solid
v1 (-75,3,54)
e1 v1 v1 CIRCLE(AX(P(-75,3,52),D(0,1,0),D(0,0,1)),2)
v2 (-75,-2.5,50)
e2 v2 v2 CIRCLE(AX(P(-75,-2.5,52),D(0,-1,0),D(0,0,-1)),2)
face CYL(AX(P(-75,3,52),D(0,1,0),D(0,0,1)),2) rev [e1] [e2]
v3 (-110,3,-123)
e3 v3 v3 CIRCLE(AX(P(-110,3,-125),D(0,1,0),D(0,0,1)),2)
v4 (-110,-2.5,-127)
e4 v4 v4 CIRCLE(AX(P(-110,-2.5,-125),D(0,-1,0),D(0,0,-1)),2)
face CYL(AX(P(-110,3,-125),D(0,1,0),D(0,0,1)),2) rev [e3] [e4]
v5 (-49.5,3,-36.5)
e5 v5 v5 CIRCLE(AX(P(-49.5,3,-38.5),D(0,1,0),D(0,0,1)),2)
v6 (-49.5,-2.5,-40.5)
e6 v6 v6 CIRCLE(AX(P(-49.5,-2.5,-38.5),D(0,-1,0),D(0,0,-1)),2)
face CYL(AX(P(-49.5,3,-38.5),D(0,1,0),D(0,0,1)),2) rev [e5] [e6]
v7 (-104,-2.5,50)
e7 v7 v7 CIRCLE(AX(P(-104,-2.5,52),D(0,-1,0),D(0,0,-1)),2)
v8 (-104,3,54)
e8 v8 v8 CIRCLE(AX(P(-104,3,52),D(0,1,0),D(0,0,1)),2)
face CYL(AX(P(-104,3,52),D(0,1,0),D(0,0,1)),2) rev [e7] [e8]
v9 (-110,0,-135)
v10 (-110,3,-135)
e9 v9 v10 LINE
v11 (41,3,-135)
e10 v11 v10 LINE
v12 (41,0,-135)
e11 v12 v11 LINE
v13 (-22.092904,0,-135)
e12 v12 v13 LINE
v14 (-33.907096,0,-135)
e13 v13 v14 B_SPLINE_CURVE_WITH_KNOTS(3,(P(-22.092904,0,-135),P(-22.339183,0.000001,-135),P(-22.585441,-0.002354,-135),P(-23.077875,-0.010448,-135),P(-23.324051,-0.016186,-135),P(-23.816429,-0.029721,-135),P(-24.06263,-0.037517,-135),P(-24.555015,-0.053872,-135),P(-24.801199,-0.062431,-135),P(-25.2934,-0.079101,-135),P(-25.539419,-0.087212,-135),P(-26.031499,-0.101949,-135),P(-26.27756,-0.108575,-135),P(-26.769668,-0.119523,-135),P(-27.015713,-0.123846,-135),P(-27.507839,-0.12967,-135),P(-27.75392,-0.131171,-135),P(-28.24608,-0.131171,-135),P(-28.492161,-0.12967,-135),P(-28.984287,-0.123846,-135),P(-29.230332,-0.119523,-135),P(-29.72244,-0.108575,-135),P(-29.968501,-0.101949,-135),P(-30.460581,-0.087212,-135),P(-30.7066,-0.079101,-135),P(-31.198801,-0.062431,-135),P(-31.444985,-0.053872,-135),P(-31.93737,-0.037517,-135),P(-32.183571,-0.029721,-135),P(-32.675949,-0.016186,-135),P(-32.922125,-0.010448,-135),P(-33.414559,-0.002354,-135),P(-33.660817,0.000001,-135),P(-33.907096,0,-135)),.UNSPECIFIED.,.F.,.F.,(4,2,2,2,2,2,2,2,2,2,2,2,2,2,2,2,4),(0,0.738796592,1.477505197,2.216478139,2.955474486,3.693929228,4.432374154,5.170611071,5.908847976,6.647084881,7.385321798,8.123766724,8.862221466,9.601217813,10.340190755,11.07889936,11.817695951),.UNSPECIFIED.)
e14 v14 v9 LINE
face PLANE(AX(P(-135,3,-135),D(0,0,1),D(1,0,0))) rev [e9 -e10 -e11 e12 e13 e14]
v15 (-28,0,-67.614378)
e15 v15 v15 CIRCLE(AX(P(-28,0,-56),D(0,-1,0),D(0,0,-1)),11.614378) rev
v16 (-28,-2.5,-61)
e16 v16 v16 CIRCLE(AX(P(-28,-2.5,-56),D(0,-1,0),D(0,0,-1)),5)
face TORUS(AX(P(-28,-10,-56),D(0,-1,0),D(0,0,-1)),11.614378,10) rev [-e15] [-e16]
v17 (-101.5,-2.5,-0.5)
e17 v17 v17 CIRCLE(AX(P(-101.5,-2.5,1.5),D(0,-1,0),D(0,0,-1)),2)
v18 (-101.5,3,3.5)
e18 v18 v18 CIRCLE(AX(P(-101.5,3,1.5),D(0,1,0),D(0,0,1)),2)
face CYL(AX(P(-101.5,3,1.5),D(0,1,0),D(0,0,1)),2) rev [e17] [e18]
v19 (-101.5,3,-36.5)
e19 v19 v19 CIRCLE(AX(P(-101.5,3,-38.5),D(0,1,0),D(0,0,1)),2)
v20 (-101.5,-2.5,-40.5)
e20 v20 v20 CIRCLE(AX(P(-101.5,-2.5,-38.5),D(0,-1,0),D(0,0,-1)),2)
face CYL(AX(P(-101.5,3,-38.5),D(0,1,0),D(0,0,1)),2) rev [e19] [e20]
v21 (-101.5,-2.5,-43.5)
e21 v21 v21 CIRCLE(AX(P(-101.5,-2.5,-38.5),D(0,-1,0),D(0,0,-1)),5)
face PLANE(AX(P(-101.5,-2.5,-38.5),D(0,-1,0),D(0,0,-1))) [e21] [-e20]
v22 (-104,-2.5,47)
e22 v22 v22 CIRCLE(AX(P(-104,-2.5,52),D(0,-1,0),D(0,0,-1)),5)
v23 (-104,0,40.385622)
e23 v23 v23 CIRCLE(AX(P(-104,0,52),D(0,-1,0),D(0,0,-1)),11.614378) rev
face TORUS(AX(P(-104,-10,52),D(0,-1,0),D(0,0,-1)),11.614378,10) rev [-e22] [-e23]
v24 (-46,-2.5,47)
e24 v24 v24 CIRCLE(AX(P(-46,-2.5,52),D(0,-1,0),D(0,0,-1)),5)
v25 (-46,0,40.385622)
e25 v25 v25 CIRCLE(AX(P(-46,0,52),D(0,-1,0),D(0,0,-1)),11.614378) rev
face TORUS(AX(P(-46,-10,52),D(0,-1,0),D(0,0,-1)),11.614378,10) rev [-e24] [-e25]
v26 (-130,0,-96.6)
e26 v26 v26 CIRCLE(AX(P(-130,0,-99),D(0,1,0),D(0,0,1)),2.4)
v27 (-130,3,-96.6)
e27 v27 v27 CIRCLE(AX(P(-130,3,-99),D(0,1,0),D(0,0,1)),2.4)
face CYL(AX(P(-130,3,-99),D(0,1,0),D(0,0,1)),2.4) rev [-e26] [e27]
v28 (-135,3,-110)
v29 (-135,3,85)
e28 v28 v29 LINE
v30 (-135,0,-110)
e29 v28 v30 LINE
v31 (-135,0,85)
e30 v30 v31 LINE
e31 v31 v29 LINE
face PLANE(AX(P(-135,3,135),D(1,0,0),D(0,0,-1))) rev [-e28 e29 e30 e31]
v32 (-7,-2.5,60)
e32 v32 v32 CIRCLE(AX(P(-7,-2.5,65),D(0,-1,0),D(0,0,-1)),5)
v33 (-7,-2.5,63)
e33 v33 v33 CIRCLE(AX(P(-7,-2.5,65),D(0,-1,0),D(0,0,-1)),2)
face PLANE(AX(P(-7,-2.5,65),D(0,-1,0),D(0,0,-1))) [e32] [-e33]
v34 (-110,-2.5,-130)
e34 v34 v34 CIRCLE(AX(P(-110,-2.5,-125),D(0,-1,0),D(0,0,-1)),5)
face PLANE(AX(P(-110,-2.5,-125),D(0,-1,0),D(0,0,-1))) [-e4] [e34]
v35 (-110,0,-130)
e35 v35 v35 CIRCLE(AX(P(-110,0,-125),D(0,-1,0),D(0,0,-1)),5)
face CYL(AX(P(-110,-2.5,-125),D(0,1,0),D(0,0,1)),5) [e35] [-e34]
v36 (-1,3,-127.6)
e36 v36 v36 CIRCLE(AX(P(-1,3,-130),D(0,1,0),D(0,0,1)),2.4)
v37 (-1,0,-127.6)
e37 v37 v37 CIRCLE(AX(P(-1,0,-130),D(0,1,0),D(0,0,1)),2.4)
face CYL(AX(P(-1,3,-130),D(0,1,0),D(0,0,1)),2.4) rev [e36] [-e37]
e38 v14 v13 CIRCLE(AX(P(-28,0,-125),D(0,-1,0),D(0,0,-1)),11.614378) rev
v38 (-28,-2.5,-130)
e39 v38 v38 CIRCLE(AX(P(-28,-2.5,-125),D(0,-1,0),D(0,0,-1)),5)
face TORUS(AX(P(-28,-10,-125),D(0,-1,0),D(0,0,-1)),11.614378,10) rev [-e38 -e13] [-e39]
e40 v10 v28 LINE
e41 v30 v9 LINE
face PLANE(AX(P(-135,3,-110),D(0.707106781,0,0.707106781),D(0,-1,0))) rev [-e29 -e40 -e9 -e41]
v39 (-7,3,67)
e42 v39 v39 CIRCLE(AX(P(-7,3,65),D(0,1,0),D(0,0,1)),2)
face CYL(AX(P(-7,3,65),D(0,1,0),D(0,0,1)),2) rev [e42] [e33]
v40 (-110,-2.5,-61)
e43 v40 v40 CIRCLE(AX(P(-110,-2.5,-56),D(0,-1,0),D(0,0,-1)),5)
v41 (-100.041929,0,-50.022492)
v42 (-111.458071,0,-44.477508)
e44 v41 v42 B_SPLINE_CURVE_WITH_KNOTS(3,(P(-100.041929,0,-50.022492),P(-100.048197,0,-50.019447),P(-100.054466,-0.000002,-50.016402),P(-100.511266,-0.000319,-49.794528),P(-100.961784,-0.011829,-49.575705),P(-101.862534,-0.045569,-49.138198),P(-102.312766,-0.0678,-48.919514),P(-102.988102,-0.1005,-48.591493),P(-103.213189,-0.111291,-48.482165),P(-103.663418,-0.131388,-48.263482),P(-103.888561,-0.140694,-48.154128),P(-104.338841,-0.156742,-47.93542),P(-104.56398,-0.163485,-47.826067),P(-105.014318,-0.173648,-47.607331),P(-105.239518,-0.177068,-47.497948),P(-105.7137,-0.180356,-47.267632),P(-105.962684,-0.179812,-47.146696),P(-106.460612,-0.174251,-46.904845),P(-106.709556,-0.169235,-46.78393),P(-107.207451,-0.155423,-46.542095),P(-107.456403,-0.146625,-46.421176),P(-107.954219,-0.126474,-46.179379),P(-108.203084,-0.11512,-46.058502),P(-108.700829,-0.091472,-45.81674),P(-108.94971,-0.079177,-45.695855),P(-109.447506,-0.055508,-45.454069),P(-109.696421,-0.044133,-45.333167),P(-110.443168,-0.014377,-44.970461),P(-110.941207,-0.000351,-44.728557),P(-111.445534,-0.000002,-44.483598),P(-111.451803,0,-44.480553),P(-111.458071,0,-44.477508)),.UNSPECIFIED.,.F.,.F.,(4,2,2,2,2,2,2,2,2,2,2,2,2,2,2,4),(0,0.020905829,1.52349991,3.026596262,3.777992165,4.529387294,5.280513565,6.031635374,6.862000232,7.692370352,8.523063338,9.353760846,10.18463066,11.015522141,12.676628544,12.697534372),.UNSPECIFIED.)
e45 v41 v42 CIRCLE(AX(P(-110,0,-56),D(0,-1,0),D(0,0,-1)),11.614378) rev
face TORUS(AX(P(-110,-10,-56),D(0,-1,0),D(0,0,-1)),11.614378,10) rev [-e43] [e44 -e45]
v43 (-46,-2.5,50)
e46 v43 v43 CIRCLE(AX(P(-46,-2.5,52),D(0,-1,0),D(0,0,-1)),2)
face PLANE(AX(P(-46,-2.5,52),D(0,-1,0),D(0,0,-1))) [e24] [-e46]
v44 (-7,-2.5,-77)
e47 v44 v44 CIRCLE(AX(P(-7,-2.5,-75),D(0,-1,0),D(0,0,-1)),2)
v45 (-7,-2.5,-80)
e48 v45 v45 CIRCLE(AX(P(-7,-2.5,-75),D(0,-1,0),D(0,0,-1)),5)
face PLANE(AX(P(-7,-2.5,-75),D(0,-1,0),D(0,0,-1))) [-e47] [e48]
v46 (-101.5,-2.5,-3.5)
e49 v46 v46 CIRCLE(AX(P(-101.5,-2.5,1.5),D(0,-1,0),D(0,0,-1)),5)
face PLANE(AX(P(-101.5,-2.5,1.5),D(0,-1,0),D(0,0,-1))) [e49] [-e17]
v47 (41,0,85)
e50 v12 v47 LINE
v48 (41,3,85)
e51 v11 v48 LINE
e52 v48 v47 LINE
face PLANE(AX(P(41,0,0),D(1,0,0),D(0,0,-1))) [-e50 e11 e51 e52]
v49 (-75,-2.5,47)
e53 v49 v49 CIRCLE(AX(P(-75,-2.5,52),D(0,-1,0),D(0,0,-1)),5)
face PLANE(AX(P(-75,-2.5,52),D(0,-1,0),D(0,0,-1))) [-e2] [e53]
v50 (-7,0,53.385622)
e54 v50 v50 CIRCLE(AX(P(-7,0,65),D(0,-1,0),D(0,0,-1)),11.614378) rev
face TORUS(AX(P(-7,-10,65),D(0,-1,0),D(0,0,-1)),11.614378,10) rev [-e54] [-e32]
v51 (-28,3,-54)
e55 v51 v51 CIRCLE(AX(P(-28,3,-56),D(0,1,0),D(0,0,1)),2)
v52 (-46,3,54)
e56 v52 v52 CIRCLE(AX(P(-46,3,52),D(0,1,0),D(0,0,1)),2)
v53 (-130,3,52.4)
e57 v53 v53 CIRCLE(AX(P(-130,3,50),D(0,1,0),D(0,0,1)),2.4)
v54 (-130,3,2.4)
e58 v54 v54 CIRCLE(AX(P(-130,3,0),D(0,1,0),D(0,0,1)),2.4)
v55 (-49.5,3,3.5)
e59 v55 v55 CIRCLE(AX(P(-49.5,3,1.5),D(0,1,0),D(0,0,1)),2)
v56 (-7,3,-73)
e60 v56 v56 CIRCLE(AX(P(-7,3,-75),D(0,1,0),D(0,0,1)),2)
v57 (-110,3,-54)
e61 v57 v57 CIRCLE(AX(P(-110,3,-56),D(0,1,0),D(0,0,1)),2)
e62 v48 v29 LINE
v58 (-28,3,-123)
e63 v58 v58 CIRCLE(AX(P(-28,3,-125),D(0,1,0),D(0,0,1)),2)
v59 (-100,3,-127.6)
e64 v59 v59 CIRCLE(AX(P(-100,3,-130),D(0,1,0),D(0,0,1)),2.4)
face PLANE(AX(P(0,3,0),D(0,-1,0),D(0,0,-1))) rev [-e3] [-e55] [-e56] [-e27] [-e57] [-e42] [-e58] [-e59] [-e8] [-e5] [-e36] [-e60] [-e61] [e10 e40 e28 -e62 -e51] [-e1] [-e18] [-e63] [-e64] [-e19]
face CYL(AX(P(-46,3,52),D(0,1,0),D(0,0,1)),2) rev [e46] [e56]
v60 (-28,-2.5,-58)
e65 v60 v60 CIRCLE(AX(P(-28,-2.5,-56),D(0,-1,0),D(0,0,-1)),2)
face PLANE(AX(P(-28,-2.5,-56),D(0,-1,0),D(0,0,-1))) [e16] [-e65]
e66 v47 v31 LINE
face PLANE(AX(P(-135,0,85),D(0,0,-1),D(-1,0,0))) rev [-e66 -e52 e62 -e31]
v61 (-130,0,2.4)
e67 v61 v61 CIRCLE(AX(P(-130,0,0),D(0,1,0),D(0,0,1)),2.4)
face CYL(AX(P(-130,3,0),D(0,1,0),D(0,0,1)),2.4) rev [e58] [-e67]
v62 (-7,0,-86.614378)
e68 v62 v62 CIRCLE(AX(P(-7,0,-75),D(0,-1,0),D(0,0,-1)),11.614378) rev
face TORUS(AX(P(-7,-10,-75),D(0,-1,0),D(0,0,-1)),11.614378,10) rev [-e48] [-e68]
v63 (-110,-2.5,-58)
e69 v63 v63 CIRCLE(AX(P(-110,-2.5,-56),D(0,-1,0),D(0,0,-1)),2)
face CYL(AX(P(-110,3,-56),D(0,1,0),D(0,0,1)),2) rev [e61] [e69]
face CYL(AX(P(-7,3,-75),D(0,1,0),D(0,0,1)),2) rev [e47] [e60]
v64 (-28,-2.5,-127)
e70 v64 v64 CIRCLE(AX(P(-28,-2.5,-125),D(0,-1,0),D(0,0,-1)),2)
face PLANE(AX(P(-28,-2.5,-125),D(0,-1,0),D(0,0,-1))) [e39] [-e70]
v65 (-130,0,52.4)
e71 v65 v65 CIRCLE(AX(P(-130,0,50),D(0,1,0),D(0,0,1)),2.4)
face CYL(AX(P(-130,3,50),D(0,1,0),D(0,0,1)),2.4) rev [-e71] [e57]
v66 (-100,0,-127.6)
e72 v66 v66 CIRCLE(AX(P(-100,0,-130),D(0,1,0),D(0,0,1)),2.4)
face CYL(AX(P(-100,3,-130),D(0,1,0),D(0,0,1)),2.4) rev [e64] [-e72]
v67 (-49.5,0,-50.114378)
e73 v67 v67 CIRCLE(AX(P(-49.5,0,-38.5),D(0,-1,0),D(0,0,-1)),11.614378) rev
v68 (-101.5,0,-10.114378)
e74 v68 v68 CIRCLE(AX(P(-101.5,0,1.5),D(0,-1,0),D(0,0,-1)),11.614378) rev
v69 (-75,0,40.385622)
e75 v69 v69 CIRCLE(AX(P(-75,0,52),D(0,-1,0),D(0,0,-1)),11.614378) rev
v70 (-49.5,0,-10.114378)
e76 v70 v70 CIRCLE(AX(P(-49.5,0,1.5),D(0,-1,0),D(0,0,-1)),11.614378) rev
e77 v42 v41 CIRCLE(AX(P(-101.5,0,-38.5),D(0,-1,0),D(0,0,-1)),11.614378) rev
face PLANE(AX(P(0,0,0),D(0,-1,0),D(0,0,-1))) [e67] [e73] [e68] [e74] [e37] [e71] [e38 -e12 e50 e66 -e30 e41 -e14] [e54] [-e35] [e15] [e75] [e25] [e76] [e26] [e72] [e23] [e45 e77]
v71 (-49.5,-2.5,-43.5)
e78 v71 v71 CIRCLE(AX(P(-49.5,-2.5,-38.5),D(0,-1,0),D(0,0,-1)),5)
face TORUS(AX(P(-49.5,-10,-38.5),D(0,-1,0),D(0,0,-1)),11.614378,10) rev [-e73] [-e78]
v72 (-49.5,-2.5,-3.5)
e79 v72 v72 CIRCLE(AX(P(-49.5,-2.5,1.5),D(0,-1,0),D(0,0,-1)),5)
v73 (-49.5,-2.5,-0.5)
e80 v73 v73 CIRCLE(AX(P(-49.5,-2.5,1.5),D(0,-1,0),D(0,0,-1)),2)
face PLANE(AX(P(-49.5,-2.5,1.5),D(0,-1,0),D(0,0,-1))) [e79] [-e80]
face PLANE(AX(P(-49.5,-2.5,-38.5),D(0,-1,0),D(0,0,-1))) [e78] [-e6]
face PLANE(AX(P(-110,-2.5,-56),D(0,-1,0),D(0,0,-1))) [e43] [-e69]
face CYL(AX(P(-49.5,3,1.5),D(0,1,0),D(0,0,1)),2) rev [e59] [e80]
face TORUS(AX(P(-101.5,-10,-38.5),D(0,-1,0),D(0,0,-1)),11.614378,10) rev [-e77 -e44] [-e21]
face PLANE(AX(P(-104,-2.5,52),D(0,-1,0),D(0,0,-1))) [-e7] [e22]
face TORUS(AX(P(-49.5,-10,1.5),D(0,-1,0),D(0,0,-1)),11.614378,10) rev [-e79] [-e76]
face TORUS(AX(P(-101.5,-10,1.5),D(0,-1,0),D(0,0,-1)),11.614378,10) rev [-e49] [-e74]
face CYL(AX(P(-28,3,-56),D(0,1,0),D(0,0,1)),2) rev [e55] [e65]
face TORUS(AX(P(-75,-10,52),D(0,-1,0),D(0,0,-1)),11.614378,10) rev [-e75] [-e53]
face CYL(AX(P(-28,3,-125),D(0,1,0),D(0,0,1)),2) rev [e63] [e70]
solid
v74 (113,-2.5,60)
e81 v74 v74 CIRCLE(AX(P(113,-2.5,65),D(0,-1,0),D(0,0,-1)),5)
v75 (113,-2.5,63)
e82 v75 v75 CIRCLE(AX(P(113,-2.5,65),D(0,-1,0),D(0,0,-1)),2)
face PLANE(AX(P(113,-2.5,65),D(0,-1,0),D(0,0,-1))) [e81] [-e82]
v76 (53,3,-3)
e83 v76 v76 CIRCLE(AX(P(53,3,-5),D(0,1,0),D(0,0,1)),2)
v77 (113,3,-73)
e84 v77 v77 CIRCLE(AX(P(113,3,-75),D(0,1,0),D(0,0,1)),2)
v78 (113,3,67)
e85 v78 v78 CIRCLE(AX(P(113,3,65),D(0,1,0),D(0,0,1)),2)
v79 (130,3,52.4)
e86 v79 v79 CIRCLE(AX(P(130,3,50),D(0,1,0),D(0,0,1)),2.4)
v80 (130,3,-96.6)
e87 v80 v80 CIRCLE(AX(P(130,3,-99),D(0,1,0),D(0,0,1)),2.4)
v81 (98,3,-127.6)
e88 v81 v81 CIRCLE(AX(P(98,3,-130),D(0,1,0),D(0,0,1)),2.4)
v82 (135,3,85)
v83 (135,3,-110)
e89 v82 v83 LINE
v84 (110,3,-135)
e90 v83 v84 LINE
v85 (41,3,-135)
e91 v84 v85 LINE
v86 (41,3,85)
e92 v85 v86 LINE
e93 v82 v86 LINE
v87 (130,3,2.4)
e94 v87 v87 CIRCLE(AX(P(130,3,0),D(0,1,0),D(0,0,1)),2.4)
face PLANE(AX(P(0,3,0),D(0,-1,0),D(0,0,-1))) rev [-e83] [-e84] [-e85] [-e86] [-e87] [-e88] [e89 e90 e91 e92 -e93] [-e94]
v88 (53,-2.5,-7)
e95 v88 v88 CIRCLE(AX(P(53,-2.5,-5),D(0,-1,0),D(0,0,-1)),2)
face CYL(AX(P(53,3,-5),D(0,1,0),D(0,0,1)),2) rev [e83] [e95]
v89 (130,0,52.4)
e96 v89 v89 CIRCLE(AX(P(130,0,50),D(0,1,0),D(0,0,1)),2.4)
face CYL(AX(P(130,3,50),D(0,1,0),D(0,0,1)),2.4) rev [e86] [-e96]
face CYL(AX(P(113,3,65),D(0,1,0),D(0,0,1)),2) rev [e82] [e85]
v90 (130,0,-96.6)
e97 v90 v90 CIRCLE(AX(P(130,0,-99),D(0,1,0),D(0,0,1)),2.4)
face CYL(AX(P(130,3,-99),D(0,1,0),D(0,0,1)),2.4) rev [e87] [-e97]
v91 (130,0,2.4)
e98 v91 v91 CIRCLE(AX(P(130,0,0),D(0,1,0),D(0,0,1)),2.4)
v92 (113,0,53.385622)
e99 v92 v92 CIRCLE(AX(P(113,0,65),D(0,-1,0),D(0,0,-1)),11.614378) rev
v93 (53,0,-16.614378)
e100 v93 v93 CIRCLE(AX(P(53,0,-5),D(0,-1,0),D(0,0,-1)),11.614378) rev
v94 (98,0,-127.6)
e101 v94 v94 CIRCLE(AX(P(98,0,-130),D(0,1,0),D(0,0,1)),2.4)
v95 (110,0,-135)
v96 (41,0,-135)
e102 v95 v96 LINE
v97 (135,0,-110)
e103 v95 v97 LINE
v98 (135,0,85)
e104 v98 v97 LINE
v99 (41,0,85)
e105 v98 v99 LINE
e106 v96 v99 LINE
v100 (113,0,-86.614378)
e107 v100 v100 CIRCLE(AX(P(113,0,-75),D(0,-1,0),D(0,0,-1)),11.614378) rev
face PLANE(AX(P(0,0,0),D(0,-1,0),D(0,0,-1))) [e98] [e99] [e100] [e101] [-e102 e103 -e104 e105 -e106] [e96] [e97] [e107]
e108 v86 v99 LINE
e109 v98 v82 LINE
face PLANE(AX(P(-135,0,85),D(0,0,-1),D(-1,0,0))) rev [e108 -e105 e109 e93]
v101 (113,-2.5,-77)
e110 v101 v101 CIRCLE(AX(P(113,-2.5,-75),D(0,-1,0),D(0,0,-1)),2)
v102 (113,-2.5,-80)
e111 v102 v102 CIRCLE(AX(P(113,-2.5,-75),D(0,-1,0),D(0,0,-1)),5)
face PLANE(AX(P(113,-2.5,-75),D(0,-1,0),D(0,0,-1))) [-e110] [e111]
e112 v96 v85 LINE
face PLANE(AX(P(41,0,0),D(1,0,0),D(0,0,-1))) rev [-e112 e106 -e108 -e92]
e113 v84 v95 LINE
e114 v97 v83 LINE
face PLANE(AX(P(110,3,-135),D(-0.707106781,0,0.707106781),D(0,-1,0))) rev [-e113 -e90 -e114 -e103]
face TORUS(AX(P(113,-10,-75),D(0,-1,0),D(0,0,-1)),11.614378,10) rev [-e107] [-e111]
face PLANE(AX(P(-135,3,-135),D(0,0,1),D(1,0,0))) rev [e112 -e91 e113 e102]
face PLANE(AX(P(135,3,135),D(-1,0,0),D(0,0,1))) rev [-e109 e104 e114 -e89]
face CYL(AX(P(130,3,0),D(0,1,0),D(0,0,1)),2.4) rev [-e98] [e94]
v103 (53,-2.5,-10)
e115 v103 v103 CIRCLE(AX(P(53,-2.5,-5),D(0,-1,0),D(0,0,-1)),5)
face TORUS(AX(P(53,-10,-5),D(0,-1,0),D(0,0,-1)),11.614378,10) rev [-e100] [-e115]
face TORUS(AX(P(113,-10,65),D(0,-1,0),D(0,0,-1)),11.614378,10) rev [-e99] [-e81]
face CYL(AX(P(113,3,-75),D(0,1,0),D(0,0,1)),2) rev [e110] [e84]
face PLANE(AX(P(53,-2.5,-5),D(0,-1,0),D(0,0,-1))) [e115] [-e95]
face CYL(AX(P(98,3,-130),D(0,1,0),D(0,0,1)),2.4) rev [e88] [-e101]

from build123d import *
from build123d.topology import SkipClean

# Parameters (mm, degrees)
SKETCH1_W                        = 270
SKETCH1_H                        = 270
BOSS_EXTRUDE1_DEPTH              = 3
M4_CLEARANCE_HOLE1_D             = 4.8
SKETCH6_W                        = 270
SKETCH6_H                        = 50
CUT_EXTRUDE1_DEPTH               = 191.942399692
F_4_0_4_DIAMETER_HOLE1_OUTLINE_R = 2
F_4_0_4_DIAMETER_HOLE1_DEPTH     = 3
CHAMFER1_SIZE                    = 25
BOSS_EXTRUDE2_START              = 2.5
SKETCH10_R                       = 5
SKETCH10_R_2                     = 2
BOSS_EXTRUDE2_DEPTH              = 2.5
FILLET1_R                        = 10


# Read off the part's stored shape, not the designer's step: Ø4.0 (4) Diameter Hole1
with BuildPart() as part:
    # Sketch1 → Boss-Extrude1 (new body)
    with BuildSketch(Plane(origin=(0, 0, 0), x_dir=(1, 0, 0), z_dir=(0, 1, 0))):
        Rectangle(SKETCH1_W, SKETCH1_H)
    extrude(amount=BOSS_EXTRUDE1_DEPTH)

    # M4 Clearance Hole1 (through all)
    with Locations(Plane(origin=(0, 3, 0), x_dir=(1, 0, 0), z_dir=(0, 1, 0))):
        with Locations((98, 130), (-1, 130), (-100, 130), (130, -50), (-130, -50), (-130, 0), (130, 99), (-130, 99), (130, 0)):
            Hole(M4_CLEARANCE_HOLE1_D / 2)

    # Sketch6 → Cut-Extrude1 (cut, through all)
    with BuildSketch(Plane(origin=(0, 3, 0), x_dir=(1, 0, 0), z_dir=(0, 1, 0))):
        with Locations((0, -110)):
            Rectangle(SKETCH6_W, SKETCH6_H)
    extrude(amount=-CUT_EXTRUDE1_DEPTH, mode=Mode.SUBTRACT)

    # Ø4.0 (4) Diameter Hole1 outline → Ø4.0 (4) Diameter Hole1 (cut)
    with BuildSketch(Plane(origin=(0, 0, 0), x_dir=(1, 0, 0), z_dir=(0, 1, 0))):
        with Locations((-75, -52)):
            Circle(F_4_0_4_DIAMETER_HOLE1_OUTLINE_R)
        with Locations((-104, -52)):
            Circle(F_4_0_4_DIAMETER_HOLE1_OUTLINE_R)
        with Locations((-46, -52)):
            Circle(F_4_0_4_DIAMETER_HOLE1_OUTLINE_R)
        with Locations((53, 5)):
            Circle(F_4_0_4_DIAMETER_HOLE1_OUTLINE_R)
        with Locations((113, -65)):
            Circle(F_4_0_4_DIAMETER_HOLE1_OUTLINE_R)
        with Locations((-7, 75)):
            Circle(F_4_0_4_DIAMETER_HOLE1_OUTLINE_R)
        with Locations((-7, -65)):
            Circle(F_4_0_4_DIAMETER_HOLE1_OUTLINE_R)
        with Locations((113, 75)):
            Circle(F_4_0_4_DIAMETER_HOLE1_OUTLINE_R)
        with Locations((-49.5, -1.5)):
            Circle(F_4_0_4_DIAMETER_HOLE1_OUTLINE_R)
        with Locations((-49.5, 38.5)):
            Circle(F_4_0_4_DIAMETER_HOLE1_OUTLINE_R)
        with Locations((-101.5, -1.5)):
            Circle(F_4_0_4_DIAMETER_HOLE1_OUTLINE_R)
        with Locations((-101.5, 38.5)):
            Circle(F_4_0_4_DIAMETER_HOLE1_OUTLINE_R)
        with Locations((-28, 56)):
            Circle(F_4_0_4_DIAMETER_HOLE1_OUTLINE_R)
        with Locations((-110, 56)):
            Circle(F_4_0_4_DIAMETER_HOLE1_OUTLINE_R)
        with Locations((-28, 125)):
            Circle(F_4_0_4_DIAMETER_HOLE1_OUTLINE_R)
        with Locations((-110, 125)):
            Circle(F_4_0_4_DIAMETER_HOLE1_OUTLINE_R)
    extrude(amount=F_4_0_4_DIAMETER_HOLE1_DEPTH, mode=Mode.SUBTRACT)

    # Chamfer1
    chamfer1_edges = [part.edges().sort_by_distance(p)[0] for p in [
        (-135, 1.5, -135),
        (135, 1.5, -135),
    ]]
    chamfer(chamfer1_edges, length=CHAMFER1_SIZE)

    # Sketch10 → Boss-Extrude2 (add)
    # profile 1 of 16: a face of its own
    with SkipClean():  # the faces are left unmerged after this step: merging them gives an invalid solid
        with BuildSketch(Plane.XZ.offset(BOSS_EXTRUDE2_START)):
            with Locations(Location((-75, 52, 0), (0, 0, 270))):
                Circle(SKETCH10_R)
            with Locations(Location((-75, 52, 0), (0, 0, 90))):
                Circle(SKETCH10_R_2, mode=Mode.SUBTRACT)
        # profile 2 of 16: a face of its own
        with BuildSketch(Plane.XZ.offset(BOSS_EXTRUDE2_START)):
            with Locations(Location((-104, 52, 0), (0, 0, 270))):
                Circle(SKETCH10_R)
            with Locations(Location((-104, 52, 0), (0, 0, 90))):
                Circle(SKETCH10_R_2, mode=Mode.SUBTRACT)
        # profile 3 of 16: a face of its own
        with BuildSketch(Plane.XZ.offset(BOSS_EXTRUDE2_START)):
            with Locations(Location((-46, 52, 0), (0, 0, 270))):
                Circle(SKETCH10_R)
            with Locations(Location((-46, 52, 0), (0, 0, 90))):
                Circle(SKETCH10_R_2, mode=Mode.SUBTRACT)
        # profile 4 of 16: a face of its own
        with BuildSketch(Plane.XZ.offset(BOSS_EXTRUDE2_START)):
            with Locations(Location((53, -5, 0), (0, 0, 270))):
                Circle(SKETCH10_R)
            with Locations(Location((53, -5, 0), (0, 0, 90))):
                Circle(SKETCH10_R_2, mode=Mode.SUBTRACT)
        # profile 5 of 16: a face of its own
        with BuildSketch(Plane.XZ.offset(BOSS_EXTRUDE2_START)):
            with Locations(Location((113, 65, 0), (0, 0, 270))):
                Circle(SKETCH10_R)
            with Locations(Location((113, 65, 0), (0, 0, 90))):
                Circle(SKETCH10_R_2, mode=Mode.SUBTRACT)
        # profile 6 of 16: a face of its own
        with BuildSketch(Plane.XZ.offset(BOSS_EXTRUDE2_START)):
            with Locations(Location((-7, -75, 0), (0, 0, 270))):
                Circle(SKETCH10_R)
            with Locations(Location((-7, -75, 0), (0, 0, 90))):
                Circle(SKETCH10_R_2, mode=Mode.SUBTRACT)
        # profile 7 of 16: a face of its own
        with BuildSketch(Plane.XZ.offset(BOSS_EXTRUDE2_START)):
            with Locations(Location((-7, 65, 0), (0, 0, 270))):
                Circle(SKETCH10_R)
            with Locations(Location((-7, 65, 0), (0, 0, 90))):
                Circle(SKETCH10_R_2, mode=Mode.SUBTRACT)
        # profile 8 of 16: a face of its own
        with BuildSketch(Plane.XZ.offset(BOSS_EXTRUDE2_START)):
            with Locations(Location((113, -75, 0), (0, 0, 270))):
                Circle(SKETCH10_R)
            with Locations(Location((113, -75, 0), (0, 0, 90))):
                Circle(SKETCH10_R_2, mode=Mode.SUBTRACT)
        # profile 9 of 16: a face of its own
        with BuildSketch(Plane.XZ.offset(BOSS_EXTRUDE2_START)):
            with Locations(Location((-49.5, 1.5, 0), (0, 0, 270))):
                Circle(SKETCH10_R)
            with Locations(Location((-49.5, 1.5, 0), (0, 0, 90))):
                Circle(SKETCH10_R_2, mode=Mode.SUBTRACT)
        # profile 10 of 16: a face of its own
        with BuildSketch(Plane.XZ.offset(BOSS_EXTRUDE2_START)):
            with Locations(Location((-49.5, -38.5, 0), (0, 0, 270))):
                Circle(SKETCH10_R)
            with Locations(Location((-49.5, -38.5, 0), (0, 0, 90))):
                Circle(SKETCH10_R_2, mode=Mode.SUBTRACT)
        # profile 11 of 16: a face of its own
        with BuildSketch(Plane.XZ.offset(BOSS_EXTRUDE2_START)):
            with Locations(Location((-101.5, 1.5, 0), (0, 0, 270))):
                Circle(SKETCH10_R)
            with Locations(Location((-101.5, 1.5, 0), (0, 0, 90))):
                Circle(SKETCH10_R_2, mode=Mode.SUBTRACT)
        # profile 12 of 16: a face of its own
        with BuildSketch(Plane.XZ.offset(BOSS_EXTRUDE2_START)):
            with Locations(Location((-101.5, -38.5, 0), (0, 0, 270))):
                Circle(SKETCH10_R)
            with Locations(Location((-101.5, -38.5, 0), (0, 0, 90))):
                Circle(SKETCH10_R_2, mode=Mode.SUBTRACT)
        # profile 13 of 16: a face of its own
        with BuildSketch(Plane.XZ.offset(BOSS_EXTRUDE2_START)):
            with Locations(Location((-28, -56, 0), (0, 0, 270))):
                Circle(SKETCH10_R)
            with Locations(Location((-28, -56, 0), (0, 0, 90))):
                Circle(SKETCH10_R_2, mode=Mode.SUBTRACT)
        # profile 14 of 16: a face of its own
        with BuildSketch(Plane.XZ.offset(BOSS_EXTRUDE2_START)):
            with Locations(Location((-110, -56, 0), (0, 0, 270))):
                Circle(SKETCH10_R)
            with Locations(Location((-110, -56, 0), (0, 0, 90))):
                Circle(SKETCH10_R_2, mode=Mode.SUBTRACT)
        # profile 15 of 16: a face of its own
        with BuildSketch(Plane.XZ.offset(BOSS_EXTRUDE2_START)):
            with Locations(Location((-28, -125, 0), (0, 0, 270))):
                Circle(SKETCH10_R)
            with Locations(Location((-28, -125, 0), (0, 0, 90))):
                Circle(SKETCH10_R_2, mode=Mode.SUBTRACT)
        # profile 16 of 16: a face of its own
        with BuildSketch(Plane.XZ.offset(BOSS_EXTRUDE2_START)):
            with Locations(Location((-110, -125, 0), (0, 0, 270))):
                Circle(SKETCH10_R)
            with Locations(Location((-110, -125, 0), (0, 0, 90))):
                Circle(SKETCH10_R_2, mode=Mode.SUBTRACT)
        extrude(amount=-BOSS_EXTRUDE2_DEPTH)

    # Fillet1
    # the kernel refuses this fillet: 10 mm, written as the material it adds along each edge
    with BuildSketch(Plane(origin=(-7, 0, -75), x_dir=(0, 0, -1), z_dir=(-1, 0, 0))) as fillet1_piece_1:
        with BuildLine():
            CenterArc((11.614378278, 10), FILLET1_R, 228.590377891, 41.409622109)
            Line((5, 2.5), (4.867712434, 2.35))
            ThreePointArc((4.867712434, 2.35), (4.8, 1.25), (4.8, 0))
            Line((4.8, 0), (5, -0.2))
            Line((5, -0.2), (11.614378278, -0.2))
            Line((11.614378278, -0.2), (11.614378278, 0))
        make_face()
    revolve(axis=Axis((-7, 0, -75), (0, -1, 0)))
    with BuildSketch(Plane(origin=(-7, 0, 65), x_dir=(0, 0, -1), z_dir=(-1, 0, 0))) as fillet1_piece_2:
        with BuildLine():
            CenterArc((11.614378278, 10), FILLET1_R, 228.590377891, 41.409622109)
            Line((5, 2.5), (4.867712434, 2.35))
            ThreePointArc((4.867712434, 2.35), (4.8, 1.25), (4.8, 0))
            Line((4.8, 0), (5, -0.2))
            Line((5, -0.2), (11.614378278, -0.2))
            Line((11.614378278, -0.2), (11.614378278, 0))
        make_face()
    revolve(axis=Axis((-7, 0, 65), (0, -1, 0)))
    with BuildSketch(Plane(origin=(113, 0, -75), x_dir=(0, 0, -1), z_dir=(-1, 0, 0))) as fillet1_piece_3:
        with BuildLine():
            CenterArc((11.614378278, 10), FILLET1_R, 228.590377891, 41.409622109)
            Line((5, 2.5), (4.867712434, 2.35))
            ThreePointArc((4.867712434, 2.35), (4.8, 1.25), (4.8, 0))
            Line((4.8, 0), (5, -0.2))
            Line((5, -0.2), (11.614378278, -0.2))
            Line((11.614378278, -0.2), (11.614378278, 0))
        make_face()
    revolve(axis=Axis((113, 0, -75), (0, -1, 0)))
    with BuildSketch(Plane(origin=(-49.5, 0, 1.5), x_dir=(0, 0, -1), z_dir=(-1, 0, 0))) as fillet1_piece_4:
        with BuildLine():
            CenterArc((11.614378278, 10), FILLET1_R, 228.590377891, 41.409622109)
            Line((5, 2.5), (4.867712434, 2.35))
            ThreePointArc((4.867712434, 2.35), (4.8, 1.25), (4.8, 0))
            Line((4.8, 0), (5, -0.2))
            Line((5, -0.2), (11.614378278, -0.2))
            Line((11.614378278, -0.2), (11.614378278, 0))
        make_face()
    revolve(axis=Axis((-49.5, 0, 1.5), (0, -1, 0)))
    with BuildSketch(Plane(origin=(113, 0, 65), x_dir=(0, 0, -1), z_dir=(-1, 0, 0))) as fillet1_piece_5:
        with BuildLine():
            CenterArc((11.614378278, 10), FILLET1_R, 228.590377891, 41.409622109)
            Line((5, 2.5), (4.867712434, 2.35))
            ThreePointArc((4.867712434, 2.35), (4.8, 1.25), (4.8, 0))
            Line((4.8, 0), (5, -0.2))
            Line((5, -0.2), (11.614378278, -0.2))
            Line((11.614378278, -0.2), (11.614378278, 0))
        make_face()
    revolve(axis=Axis((113, 0, 65), (0, -1, 0)))
    with BuildSketch(Plane(origin=(53, 0, -5), x_dir=(0, 0, -1), z_dir=(-1, 0, 0))) as fillet1_piece_6:
        with BuildLine():
            CenterArc((11.614378278, 10), FILLET1_R, 228.590377891, 41.409622109)
            Line((5, 2.5), (4.867712434, 2.35))
            ThreePointArc((4.867712434, 2.35), (4.8, 1.25), (4.8, 0))
            Line((4.8, 0), (5, -0.2))
            Line((5, -0.2), (11.614378278, -0.2))
            Line((11.614378278, -0.2), (11.614378278, 0))
        make_face()
    revolve(axis=Axis((53, 0, -5), (0, -1, 0)))
    with BuildSketch(Plane(origin=(-46, 0, 52), x_dir=(0, 0, -1), z_dir=(-1, 0, 0))) as fillet1_piece_7:
        with BuildLine():
            CenterArc((11.614378278, 10), FILLET1_R, 228.590377891, 41.409622109)
            Line((5, 2.5), (4.867712434, 2.35))
            ThreePointArc((4.867712434, 2.35), (4.8, 1.25), (4.8, 0))
            Line((4.8, 0), (5, -0.2))
            Line((5, -0.2), (11.614378278, -0.2))
            Line((11.614378278, -0.2), (11.614378278, 0))
        make_face()
    revolve(axis=Axis((-46, 0, 52), (0, -1, 0)))
    with BuildSketch(Plane(origin=(-104, 0, 52), x_dir=(0, 0, -1), z_dir=(-1, 0, 0))) as fillet1_piece_8:
        with BuildLine():
            CenterArc((11.614378278, 10), FILLET1_R, 228.590377891, 41.409622109)
            Line((5, 2.5), (4.867712434, 2.35))
            ThreePointArc((4.867712434, 2.35), (4.8, 1.25), (4.8, 0))
            Line((4.8, 0), (5, -0.2))
            Line((5, -0.2), (11.614378278, -0.2))
            Line((11.614378278, -0.2), (11.614378278, 0))
        make_face()
    revolve(axis=Axis((-104, 0, 52), (0, -1, 0)))
    with BuildSketch(Plane(origin=(-110, 0, -56), x_dir=(0, 0, -1), z_dir=(-1, 0, 0))) as fillet1_piece_9:
        with BuildLine():
            CenterArc((11.614378278, 10), FILLET1_R, 228.590377891, 41.409622109)
            Line((5, 2.5), (4.867712434, 2.35))
            ThreePointArc((4.867712434, 2.35), (4.8, 1.25), (4.8, 0))
            Line((4.8, 0), (5, -0.2))
            Line((5, -0.2), (11.614378278, -0.2))
            Line((11.614378278, -0.2), (11.614378278, 0))
        make_face()
    revolve(axis=Axis((-110, 0, -56), (0, -1, 0)))
    with BuildSketch(Plane(origin=(-28, 0, -125), x_dir=(0, 0, -1), z_dir=(-1, 0, 0))) as fillet1_piece_10_section:
        with BuildLine():
            CenterArc((11.614378278, 10), FILLET1_R, 228.590377891, 41.409622109)
            Line((5, 2.5), (4.867712434, 2.35))
            ThreePointArc((4.867712434, 2.35), (4.8, 1.25), (4.8, 0))
            Line((4.8, 0), (5, -0.2))
            Line((5, -0.2), (11.614378278, -0.2))
            Line((11.614378278, -0.2), (11.614378278, 0))
        make_face()
    fillet1_piece_10 = revolve(axis=Axis((-28, 0, -125), (0, -1, 0)), mode=Mode.PRIVATE)
    fillet1_piece_10 = split(fillet1_piece_10, bisect_by=Plane(origin=(-28, -0.583455208, -135), z_dir=(0, 0, 1)), keep=Keep.TOP, mode=Mode.PRIVATE)
    add(fillet1_piece_10)
    with BuildSketch(Plane(origin=(-49.5, 0, -38.5), x_dir=(0, 0, -1), z_dir=(-1, 0, 0))) as fillet1_piece_11:
        with BuildLine():
            CenterArc((11.614378278, 10), FILLET1_R, 228.590377891, 41.409622109)
            Line((5, 2.5), (4.867712434, 2.35))
            ThreePointArc((4.867712434, 2.35), (4.8, 1.25), (4.8, 0))
            Line((4.8, 0), (5, -0.2))
            Line((5, -0.2), (11.614378278, -0.2))
            Line((11.614378278, -0.2), (11.614378278, 0))
        make_face()
    revolve(axis=Axis((-49.5, 0, -38.5), (0, -1, 0)))
    with BuildSketch(Plane(origin=(-101.5, 0, 1.5), x_dir=(0, 0, -1), z_dir=(-1, 0, 0))) as fillet1_piece_12:
        with BuildLine():
            CenterArc((11.614378278, 10), FILLET1_R, 228.590377891, 41.409622109)
            Line((5, 2.5), (4.867712434, 2.35))
            ThreePointArc((4.867712434, 2.35), (4.8, 1.25), (4.8, 0))
            Line((4.8, 0), (5, -0.2))
            Line((5, -0.2), (11.614378278, -0.2))
            Line((11.614378278, -0.2), (11.614378278, 0))
        make_face()
    revolve(axis=Axis((-101.5, 0, 1.5), (0, -1, 0)))
    with BuildSketch(Plane(origin=(-101.5, 0, -38.5), x_dir=(0, 0, -1), z_dir=(-1, 0, 0))) as fillet1_piece_13:
        with BuildLine():
            CenterArc((11.614378278, 10), FILLET1_R, 228.590377891, 41.409622109)
            Line((5, 2.5), (4.867712434, 2.35))
            ThreePointArc((4.867712434, 2.35), (4.8, 1.25), (4.8, 0))
            Line((4.8, 0), (5, -0.2))
            Line((5, -0.2), (11.614378278, -0.2))
            Line((11.614378278, -0.2), (11.614378278, 0))
        make_face()
    revolve(axis=Axis((-101.5, 0, -38.5), (0, -1, 0)))
    with BuildSketch(Plane(origin=(-28, 0, -56), x_dir=(0, 0, -1), z_dir=(-1, 0, 0))) as fillet1_piece_14:
        with BuildLine():
            CenterArc((11.614378278, 10), FILLET1_R, 228.590377891, 41.409622109)
            Line((5, 2.5), (4.867712434, 2.35))
            ThreePointArc((4.867712434, 2.35), (4.8, 1.25), (4.8, 0))
            Line((4.8, 0), (5, -0.2))
            Line((5, -0.2), (11.614378278, -0.2))
            Line((11.614378278, -0.2), (11.614378278, 0))
        make_face()
    revolve(axis=Axis((-28, 0, -56), (0, -1, 0)))
    with BuildSketch(Plane(origin=(-75, 0, 52), x_dir=(0, 0, -1), z_dir=(-1, 0, 0))) as fillet1_piece_15:
        with BuildLine():
            CenterArc((11.614378278, 10), FILLET1_R, 228.590377891, 41.409622109)
            Line((5, 2.5), (4.867712434, 2.35))
            ThreePointArc((4.867712434, 2.35), (4.8, 1.25), (4.8, 0))
            Line((4.8, 0), (5, -0.2))
            Line((5, -0.2), (11.614378278, -0.2))
            Line((11.614378278, -0.2), (11.614378278, 0))
        make_face()
    revolve(axis=Axis((-75, 0, 52), (0, -1, 0)))


with BuildPart() as body_2:
    # Split1: the piece on the far side of the plane
    add(part.part)
    split(bisect_by=Plane(origin=(41, 0, 0), x_dir=(0, 0, 1), z_dir=(1, 0, 0)), keep=Keep.BOTTOM)


with BuildPart() as part_1:
    add(part.part)

    # Split1
    split(bisect_by=Plane(origin=(41, 0, 0), x_dir=(0, 0, 1), z_dir=(1, 0, 0)), keep=Keep.TOP)


solid = Compound([body_2.part, part_1.part])
